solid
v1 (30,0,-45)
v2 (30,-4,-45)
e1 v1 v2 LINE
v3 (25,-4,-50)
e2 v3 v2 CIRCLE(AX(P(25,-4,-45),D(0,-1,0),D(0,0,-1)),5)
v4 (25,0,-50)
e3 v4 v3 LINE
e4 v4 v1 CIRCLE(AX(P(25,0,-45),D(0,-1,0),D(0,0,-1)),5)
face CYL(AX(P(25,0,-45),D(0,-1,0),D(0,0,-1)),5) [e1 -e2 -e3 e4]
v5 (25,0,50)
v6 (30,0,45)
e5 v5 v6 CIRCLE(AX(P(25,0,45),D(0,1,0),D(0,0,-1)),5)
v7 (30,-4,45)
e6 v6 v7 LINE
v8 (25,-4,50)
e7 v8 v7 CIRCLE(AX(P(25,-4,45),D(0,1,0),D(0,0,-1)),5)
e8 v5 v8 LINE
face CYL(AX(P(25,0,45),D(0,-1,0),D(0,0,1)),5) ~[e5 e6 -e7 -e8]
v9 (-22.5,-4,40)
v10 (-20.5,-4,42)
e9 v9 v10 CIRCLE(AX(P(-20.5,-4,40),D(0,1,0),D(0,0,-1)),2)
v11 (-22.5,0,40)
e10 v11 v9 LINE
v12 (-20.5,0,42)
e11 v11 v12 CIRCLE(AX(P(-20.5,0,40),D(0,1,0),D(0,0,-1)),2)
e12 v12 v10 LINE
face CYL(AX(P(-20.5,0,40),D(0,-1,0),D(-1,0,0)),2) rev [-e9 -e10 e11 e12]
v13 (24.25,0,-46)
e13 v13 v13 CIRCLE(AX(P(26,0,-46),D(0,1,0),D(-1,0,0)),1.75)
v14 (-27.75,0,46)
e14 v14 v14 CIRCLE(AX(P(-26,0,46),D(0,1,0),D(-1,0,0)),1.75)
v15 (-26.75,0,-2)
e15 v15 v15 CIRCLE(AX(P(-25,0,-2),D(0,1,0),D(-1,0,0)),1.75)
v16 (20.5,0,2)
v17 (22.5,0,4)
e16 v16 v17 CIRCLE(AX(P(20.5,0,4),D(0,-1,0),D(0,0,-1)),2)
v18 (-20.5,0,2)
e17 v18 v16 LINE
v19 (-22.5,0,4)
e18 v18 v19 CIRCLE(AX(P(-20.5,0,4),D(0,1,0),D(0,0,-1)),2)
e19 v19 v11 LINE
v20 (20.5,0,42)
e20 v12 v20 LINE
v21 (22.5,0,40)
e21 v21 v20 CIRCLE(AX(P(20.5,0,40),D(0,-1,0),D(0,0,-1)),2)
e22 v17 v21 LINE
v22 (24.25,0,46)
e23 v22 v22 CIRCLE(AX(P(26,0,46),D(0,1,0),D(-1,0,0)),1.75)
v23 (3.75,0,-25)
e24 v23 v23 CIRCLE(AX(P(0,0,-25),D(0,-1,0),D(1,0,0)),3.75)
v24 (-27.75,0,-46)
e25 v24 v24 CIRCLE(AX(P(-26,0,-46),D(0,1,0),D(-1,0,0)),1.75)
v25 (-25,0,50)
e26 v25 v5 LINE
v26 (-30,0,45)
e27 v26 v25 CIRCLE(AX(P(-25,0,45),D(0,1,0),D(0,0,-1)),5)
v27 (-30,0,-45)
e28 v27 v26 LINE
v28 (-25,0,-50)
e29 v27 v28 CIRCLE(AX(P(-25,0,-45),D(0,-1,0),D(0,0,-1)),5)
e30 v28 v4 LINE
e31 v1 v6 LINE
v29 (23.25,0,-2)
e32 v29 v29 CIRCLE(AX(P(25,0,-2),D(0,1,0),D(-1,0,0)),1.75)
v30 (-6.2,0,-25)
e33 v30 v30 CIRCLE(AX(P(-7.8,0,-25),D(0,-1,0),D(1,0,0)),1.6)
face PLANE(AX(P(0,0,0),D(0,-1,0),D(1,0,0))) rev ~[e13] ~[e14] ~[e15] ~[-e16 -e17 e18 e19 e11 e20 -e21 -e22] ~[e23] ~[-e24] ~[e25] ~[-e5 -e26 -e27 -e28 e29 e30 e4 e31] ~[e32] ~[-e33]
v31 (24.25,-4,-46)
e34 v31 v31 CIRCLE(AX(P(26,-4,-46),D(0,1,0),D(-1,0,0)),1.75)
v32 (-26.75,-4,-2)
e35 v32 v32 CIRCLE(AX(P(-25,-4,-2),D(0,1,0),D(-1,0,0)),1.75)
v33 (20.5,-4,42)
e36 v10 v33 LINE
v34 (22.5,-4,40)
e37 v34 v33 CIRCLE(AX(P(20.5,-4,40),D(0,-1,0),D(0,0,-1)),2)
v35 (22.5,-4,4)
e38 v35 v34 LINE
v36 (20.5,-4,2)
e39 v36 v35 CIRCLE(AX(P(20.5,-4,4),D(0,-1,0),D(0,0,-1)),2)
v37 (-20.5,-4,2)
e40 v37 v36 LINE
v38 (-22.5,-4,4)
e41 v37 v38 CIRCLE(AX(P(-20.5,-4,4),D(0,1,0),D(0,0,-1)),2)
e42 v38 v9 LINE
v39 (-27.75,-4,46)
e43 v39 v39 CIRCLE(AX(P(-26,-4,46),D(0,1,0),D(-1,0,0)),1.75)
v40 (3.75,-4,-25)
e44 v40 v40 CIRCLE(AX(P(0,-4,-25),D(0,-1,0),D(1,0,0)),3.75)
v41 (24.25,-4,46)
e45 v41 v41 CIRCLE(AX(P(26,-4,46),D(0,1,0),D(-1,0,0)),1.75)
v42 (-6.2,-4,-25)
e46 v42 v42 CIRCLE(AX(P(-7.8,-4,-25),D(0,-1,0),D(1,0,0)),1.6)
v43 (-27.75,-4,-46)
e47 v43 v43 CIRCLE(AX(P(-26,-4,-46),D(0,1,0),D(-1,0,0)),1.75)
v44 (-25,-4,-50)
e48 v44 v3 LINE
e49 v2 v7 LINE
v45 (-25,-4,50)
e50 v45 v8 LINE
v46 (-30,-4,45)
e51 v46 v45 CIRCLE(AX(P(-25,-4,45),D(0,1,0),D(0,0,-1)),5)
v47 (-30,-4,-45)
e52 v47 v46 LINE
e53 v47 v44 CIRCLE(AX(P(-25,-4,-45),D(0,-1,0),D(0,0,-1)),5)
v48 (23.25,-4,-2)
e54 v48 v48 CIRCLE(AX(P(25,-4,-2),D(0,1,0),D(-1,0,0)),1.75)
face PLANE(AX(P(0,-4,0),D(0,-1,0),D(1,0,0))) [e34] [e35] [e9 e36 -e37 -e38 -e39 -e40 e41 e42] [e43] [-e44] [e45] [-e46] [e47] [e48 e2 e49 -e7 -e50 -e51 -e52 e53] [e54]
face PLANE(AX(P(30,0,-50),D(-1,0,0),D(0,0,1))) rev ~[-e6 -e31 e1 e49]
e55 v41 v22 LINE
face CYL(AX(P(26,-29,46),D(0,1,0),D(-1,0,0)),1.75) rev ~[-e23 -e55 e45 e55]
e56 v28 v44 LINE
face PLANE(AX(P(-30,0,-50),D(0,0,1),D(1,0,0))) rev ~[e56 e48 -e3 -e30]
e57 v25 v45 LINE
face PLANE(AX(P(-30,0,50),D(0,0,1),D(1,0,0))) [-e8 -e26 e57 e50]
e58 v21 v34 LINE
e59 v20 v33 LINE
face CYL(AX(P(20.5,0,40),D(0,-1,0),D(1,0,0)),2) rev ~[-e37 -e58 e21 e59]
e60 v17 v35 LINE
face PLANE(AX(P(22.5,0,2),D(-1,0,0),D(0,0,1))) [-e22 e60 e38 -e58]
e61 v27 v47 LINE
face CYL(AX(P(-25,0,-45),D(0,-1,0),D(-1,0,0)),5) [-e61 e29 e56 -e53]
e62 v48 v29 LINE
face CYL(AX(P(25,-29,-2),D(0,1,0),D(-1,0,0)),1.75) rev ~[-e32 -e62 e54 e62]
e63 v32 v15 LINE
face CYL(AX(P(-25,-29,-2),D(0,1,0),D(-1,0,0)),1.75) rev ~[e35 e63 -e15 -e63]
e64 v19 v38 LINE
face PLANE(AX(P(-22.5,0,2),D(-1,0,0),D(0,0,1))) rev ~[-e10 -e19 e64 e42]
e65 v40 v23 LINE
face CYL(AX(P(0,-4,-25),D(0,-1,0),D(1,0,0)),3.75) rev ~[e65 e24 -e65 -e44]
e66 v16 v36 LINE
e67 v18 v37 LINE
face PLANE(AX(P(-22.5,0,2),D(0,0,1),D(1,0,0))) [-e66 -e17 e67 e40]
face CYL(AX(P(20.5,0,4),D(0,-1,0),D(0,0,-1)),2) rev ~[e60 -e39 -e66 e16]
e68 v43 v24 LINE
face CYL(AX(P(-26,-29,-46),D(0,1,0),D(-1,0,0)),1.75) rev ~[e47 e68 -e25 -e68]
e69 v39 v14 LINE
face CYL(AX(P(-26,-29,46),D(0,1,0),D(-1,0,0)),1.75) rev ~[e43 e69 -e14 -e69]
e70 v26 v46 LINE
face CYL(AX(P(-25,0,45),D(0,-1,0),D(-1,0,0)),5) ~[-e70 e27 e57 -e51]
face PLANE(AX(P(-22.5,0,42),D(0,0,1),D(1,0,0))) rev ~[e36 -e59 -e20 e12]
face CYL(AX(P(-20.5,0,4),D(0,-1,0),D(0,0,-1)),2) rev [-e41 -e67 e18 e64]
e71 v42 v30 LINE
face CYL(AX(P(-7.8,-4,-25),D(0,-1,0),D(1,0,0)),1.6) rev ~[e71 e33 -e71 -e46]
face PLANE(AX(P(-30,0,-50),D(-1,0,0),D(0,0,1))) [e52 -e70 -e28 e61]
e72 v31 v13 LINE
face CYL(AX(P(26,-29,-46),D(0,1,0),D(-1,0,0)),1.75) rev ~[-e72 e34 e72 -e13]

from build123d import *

# Parameters (mm, degrees)
F0_W      = 60
F0_H      = 100
F0_W_2    = 45
F0_H_2    = 40
F1_DEPTH  = 4
F3_D      = 3.5
F3_DEPTH  = 25
F3_TIP    = 1.0515060833
F5_R      = 5
F6_R      = 2
F8_D      = 3.5
F8_DEPTH  = 25
F8_TIP    = 1.0515060833
F4_R      = 3.75
F4_R_2    = 1.6
F9_DEPTH  = 25
F10_DEPTH = 25


# Not quite as in the source:
# - a feature names something its author has since deleted; it is built from what else it names


with BuildPart() as f1:
    # F0 (on Front) → F1 (new body)
    with BuildSketch(Plane.XZ):
        Rectangle(F0_W, F0_H)
        with Locations((0, 22)):
            Rectangle(F0_W_2, F0_H_2, mode=Mode.SUBTRACT)
    extrude(amount=F1_DEPTH)

    # F3
    with Locations(Plane.XZ.offset(4)):
        with Locations((-26, 46), (26, 46), (26, -46), (-26, -46)):
            Hole(F3_D / 2, depth=F3_DEPTH)
            with Locations((0, 0, -(F3_DEPTH + F3_TIP / 2))):  # 118° drill point
                Cone(0, F3_D / 2, F3_TIP, mode=Mode.SUBTRACT)

    # F5
    f5_edges = [f1.edges().sort_by_distance(p)[0] for p in [
        (-30, -2, 50),
        (-30, -2, -50),
        (30, -2, -50),
        (30, -2, 50),
    ]]
    fillet(f5_edges, radius=F5_R)

    # F6
    f6_edges = [f1.edges().sort_by_distance(p)[0] for p in [
        (-22.5, -2, 2),
        (-22.5, -2, 42),
        (22.5, -2, 42),
        (22.5, -2, 2),
    ]]
    fillet(f6_edges, radius=F6_R)

    # F8
    with Locations(Plane.XZ.offset(4)):
        with Locations((-25, -2), (25, -2)):
            Hole(F8_D / 2, depth=F8_DEPTH)
            with Locations((0, 0, -(F8_DEPTH + F8_TIP / 2))):  # 118° drill point
                Cone(0, F8_D / 2, F8_TIP, mode=Mode.SUBTRACT)

    # F4 (on face) → F9 (cut)
    with BuildSketch(Plane.XZ.offset(4)):
        with Locations((0, -25)):
            Circle(F4_R)
        with Locations((-7.8, -25)):
            Circle(F4_R_2)
    extrude(amount=-F9_DEPTH, mode=Mode.SUBTRACT)

    # F4 (on face) → F10 (cut)
    with BuildSketch(Plane.XZ.offset(4)):
        with Locations((0, -25)):
            Circle(F4_R)
        with Locations((-7.8, -25)):
            Circle(F4_R_2)
    extrude(amount=-F10_DEPTH, mode=Mode.SUBTRACT)


solid = f1.part
